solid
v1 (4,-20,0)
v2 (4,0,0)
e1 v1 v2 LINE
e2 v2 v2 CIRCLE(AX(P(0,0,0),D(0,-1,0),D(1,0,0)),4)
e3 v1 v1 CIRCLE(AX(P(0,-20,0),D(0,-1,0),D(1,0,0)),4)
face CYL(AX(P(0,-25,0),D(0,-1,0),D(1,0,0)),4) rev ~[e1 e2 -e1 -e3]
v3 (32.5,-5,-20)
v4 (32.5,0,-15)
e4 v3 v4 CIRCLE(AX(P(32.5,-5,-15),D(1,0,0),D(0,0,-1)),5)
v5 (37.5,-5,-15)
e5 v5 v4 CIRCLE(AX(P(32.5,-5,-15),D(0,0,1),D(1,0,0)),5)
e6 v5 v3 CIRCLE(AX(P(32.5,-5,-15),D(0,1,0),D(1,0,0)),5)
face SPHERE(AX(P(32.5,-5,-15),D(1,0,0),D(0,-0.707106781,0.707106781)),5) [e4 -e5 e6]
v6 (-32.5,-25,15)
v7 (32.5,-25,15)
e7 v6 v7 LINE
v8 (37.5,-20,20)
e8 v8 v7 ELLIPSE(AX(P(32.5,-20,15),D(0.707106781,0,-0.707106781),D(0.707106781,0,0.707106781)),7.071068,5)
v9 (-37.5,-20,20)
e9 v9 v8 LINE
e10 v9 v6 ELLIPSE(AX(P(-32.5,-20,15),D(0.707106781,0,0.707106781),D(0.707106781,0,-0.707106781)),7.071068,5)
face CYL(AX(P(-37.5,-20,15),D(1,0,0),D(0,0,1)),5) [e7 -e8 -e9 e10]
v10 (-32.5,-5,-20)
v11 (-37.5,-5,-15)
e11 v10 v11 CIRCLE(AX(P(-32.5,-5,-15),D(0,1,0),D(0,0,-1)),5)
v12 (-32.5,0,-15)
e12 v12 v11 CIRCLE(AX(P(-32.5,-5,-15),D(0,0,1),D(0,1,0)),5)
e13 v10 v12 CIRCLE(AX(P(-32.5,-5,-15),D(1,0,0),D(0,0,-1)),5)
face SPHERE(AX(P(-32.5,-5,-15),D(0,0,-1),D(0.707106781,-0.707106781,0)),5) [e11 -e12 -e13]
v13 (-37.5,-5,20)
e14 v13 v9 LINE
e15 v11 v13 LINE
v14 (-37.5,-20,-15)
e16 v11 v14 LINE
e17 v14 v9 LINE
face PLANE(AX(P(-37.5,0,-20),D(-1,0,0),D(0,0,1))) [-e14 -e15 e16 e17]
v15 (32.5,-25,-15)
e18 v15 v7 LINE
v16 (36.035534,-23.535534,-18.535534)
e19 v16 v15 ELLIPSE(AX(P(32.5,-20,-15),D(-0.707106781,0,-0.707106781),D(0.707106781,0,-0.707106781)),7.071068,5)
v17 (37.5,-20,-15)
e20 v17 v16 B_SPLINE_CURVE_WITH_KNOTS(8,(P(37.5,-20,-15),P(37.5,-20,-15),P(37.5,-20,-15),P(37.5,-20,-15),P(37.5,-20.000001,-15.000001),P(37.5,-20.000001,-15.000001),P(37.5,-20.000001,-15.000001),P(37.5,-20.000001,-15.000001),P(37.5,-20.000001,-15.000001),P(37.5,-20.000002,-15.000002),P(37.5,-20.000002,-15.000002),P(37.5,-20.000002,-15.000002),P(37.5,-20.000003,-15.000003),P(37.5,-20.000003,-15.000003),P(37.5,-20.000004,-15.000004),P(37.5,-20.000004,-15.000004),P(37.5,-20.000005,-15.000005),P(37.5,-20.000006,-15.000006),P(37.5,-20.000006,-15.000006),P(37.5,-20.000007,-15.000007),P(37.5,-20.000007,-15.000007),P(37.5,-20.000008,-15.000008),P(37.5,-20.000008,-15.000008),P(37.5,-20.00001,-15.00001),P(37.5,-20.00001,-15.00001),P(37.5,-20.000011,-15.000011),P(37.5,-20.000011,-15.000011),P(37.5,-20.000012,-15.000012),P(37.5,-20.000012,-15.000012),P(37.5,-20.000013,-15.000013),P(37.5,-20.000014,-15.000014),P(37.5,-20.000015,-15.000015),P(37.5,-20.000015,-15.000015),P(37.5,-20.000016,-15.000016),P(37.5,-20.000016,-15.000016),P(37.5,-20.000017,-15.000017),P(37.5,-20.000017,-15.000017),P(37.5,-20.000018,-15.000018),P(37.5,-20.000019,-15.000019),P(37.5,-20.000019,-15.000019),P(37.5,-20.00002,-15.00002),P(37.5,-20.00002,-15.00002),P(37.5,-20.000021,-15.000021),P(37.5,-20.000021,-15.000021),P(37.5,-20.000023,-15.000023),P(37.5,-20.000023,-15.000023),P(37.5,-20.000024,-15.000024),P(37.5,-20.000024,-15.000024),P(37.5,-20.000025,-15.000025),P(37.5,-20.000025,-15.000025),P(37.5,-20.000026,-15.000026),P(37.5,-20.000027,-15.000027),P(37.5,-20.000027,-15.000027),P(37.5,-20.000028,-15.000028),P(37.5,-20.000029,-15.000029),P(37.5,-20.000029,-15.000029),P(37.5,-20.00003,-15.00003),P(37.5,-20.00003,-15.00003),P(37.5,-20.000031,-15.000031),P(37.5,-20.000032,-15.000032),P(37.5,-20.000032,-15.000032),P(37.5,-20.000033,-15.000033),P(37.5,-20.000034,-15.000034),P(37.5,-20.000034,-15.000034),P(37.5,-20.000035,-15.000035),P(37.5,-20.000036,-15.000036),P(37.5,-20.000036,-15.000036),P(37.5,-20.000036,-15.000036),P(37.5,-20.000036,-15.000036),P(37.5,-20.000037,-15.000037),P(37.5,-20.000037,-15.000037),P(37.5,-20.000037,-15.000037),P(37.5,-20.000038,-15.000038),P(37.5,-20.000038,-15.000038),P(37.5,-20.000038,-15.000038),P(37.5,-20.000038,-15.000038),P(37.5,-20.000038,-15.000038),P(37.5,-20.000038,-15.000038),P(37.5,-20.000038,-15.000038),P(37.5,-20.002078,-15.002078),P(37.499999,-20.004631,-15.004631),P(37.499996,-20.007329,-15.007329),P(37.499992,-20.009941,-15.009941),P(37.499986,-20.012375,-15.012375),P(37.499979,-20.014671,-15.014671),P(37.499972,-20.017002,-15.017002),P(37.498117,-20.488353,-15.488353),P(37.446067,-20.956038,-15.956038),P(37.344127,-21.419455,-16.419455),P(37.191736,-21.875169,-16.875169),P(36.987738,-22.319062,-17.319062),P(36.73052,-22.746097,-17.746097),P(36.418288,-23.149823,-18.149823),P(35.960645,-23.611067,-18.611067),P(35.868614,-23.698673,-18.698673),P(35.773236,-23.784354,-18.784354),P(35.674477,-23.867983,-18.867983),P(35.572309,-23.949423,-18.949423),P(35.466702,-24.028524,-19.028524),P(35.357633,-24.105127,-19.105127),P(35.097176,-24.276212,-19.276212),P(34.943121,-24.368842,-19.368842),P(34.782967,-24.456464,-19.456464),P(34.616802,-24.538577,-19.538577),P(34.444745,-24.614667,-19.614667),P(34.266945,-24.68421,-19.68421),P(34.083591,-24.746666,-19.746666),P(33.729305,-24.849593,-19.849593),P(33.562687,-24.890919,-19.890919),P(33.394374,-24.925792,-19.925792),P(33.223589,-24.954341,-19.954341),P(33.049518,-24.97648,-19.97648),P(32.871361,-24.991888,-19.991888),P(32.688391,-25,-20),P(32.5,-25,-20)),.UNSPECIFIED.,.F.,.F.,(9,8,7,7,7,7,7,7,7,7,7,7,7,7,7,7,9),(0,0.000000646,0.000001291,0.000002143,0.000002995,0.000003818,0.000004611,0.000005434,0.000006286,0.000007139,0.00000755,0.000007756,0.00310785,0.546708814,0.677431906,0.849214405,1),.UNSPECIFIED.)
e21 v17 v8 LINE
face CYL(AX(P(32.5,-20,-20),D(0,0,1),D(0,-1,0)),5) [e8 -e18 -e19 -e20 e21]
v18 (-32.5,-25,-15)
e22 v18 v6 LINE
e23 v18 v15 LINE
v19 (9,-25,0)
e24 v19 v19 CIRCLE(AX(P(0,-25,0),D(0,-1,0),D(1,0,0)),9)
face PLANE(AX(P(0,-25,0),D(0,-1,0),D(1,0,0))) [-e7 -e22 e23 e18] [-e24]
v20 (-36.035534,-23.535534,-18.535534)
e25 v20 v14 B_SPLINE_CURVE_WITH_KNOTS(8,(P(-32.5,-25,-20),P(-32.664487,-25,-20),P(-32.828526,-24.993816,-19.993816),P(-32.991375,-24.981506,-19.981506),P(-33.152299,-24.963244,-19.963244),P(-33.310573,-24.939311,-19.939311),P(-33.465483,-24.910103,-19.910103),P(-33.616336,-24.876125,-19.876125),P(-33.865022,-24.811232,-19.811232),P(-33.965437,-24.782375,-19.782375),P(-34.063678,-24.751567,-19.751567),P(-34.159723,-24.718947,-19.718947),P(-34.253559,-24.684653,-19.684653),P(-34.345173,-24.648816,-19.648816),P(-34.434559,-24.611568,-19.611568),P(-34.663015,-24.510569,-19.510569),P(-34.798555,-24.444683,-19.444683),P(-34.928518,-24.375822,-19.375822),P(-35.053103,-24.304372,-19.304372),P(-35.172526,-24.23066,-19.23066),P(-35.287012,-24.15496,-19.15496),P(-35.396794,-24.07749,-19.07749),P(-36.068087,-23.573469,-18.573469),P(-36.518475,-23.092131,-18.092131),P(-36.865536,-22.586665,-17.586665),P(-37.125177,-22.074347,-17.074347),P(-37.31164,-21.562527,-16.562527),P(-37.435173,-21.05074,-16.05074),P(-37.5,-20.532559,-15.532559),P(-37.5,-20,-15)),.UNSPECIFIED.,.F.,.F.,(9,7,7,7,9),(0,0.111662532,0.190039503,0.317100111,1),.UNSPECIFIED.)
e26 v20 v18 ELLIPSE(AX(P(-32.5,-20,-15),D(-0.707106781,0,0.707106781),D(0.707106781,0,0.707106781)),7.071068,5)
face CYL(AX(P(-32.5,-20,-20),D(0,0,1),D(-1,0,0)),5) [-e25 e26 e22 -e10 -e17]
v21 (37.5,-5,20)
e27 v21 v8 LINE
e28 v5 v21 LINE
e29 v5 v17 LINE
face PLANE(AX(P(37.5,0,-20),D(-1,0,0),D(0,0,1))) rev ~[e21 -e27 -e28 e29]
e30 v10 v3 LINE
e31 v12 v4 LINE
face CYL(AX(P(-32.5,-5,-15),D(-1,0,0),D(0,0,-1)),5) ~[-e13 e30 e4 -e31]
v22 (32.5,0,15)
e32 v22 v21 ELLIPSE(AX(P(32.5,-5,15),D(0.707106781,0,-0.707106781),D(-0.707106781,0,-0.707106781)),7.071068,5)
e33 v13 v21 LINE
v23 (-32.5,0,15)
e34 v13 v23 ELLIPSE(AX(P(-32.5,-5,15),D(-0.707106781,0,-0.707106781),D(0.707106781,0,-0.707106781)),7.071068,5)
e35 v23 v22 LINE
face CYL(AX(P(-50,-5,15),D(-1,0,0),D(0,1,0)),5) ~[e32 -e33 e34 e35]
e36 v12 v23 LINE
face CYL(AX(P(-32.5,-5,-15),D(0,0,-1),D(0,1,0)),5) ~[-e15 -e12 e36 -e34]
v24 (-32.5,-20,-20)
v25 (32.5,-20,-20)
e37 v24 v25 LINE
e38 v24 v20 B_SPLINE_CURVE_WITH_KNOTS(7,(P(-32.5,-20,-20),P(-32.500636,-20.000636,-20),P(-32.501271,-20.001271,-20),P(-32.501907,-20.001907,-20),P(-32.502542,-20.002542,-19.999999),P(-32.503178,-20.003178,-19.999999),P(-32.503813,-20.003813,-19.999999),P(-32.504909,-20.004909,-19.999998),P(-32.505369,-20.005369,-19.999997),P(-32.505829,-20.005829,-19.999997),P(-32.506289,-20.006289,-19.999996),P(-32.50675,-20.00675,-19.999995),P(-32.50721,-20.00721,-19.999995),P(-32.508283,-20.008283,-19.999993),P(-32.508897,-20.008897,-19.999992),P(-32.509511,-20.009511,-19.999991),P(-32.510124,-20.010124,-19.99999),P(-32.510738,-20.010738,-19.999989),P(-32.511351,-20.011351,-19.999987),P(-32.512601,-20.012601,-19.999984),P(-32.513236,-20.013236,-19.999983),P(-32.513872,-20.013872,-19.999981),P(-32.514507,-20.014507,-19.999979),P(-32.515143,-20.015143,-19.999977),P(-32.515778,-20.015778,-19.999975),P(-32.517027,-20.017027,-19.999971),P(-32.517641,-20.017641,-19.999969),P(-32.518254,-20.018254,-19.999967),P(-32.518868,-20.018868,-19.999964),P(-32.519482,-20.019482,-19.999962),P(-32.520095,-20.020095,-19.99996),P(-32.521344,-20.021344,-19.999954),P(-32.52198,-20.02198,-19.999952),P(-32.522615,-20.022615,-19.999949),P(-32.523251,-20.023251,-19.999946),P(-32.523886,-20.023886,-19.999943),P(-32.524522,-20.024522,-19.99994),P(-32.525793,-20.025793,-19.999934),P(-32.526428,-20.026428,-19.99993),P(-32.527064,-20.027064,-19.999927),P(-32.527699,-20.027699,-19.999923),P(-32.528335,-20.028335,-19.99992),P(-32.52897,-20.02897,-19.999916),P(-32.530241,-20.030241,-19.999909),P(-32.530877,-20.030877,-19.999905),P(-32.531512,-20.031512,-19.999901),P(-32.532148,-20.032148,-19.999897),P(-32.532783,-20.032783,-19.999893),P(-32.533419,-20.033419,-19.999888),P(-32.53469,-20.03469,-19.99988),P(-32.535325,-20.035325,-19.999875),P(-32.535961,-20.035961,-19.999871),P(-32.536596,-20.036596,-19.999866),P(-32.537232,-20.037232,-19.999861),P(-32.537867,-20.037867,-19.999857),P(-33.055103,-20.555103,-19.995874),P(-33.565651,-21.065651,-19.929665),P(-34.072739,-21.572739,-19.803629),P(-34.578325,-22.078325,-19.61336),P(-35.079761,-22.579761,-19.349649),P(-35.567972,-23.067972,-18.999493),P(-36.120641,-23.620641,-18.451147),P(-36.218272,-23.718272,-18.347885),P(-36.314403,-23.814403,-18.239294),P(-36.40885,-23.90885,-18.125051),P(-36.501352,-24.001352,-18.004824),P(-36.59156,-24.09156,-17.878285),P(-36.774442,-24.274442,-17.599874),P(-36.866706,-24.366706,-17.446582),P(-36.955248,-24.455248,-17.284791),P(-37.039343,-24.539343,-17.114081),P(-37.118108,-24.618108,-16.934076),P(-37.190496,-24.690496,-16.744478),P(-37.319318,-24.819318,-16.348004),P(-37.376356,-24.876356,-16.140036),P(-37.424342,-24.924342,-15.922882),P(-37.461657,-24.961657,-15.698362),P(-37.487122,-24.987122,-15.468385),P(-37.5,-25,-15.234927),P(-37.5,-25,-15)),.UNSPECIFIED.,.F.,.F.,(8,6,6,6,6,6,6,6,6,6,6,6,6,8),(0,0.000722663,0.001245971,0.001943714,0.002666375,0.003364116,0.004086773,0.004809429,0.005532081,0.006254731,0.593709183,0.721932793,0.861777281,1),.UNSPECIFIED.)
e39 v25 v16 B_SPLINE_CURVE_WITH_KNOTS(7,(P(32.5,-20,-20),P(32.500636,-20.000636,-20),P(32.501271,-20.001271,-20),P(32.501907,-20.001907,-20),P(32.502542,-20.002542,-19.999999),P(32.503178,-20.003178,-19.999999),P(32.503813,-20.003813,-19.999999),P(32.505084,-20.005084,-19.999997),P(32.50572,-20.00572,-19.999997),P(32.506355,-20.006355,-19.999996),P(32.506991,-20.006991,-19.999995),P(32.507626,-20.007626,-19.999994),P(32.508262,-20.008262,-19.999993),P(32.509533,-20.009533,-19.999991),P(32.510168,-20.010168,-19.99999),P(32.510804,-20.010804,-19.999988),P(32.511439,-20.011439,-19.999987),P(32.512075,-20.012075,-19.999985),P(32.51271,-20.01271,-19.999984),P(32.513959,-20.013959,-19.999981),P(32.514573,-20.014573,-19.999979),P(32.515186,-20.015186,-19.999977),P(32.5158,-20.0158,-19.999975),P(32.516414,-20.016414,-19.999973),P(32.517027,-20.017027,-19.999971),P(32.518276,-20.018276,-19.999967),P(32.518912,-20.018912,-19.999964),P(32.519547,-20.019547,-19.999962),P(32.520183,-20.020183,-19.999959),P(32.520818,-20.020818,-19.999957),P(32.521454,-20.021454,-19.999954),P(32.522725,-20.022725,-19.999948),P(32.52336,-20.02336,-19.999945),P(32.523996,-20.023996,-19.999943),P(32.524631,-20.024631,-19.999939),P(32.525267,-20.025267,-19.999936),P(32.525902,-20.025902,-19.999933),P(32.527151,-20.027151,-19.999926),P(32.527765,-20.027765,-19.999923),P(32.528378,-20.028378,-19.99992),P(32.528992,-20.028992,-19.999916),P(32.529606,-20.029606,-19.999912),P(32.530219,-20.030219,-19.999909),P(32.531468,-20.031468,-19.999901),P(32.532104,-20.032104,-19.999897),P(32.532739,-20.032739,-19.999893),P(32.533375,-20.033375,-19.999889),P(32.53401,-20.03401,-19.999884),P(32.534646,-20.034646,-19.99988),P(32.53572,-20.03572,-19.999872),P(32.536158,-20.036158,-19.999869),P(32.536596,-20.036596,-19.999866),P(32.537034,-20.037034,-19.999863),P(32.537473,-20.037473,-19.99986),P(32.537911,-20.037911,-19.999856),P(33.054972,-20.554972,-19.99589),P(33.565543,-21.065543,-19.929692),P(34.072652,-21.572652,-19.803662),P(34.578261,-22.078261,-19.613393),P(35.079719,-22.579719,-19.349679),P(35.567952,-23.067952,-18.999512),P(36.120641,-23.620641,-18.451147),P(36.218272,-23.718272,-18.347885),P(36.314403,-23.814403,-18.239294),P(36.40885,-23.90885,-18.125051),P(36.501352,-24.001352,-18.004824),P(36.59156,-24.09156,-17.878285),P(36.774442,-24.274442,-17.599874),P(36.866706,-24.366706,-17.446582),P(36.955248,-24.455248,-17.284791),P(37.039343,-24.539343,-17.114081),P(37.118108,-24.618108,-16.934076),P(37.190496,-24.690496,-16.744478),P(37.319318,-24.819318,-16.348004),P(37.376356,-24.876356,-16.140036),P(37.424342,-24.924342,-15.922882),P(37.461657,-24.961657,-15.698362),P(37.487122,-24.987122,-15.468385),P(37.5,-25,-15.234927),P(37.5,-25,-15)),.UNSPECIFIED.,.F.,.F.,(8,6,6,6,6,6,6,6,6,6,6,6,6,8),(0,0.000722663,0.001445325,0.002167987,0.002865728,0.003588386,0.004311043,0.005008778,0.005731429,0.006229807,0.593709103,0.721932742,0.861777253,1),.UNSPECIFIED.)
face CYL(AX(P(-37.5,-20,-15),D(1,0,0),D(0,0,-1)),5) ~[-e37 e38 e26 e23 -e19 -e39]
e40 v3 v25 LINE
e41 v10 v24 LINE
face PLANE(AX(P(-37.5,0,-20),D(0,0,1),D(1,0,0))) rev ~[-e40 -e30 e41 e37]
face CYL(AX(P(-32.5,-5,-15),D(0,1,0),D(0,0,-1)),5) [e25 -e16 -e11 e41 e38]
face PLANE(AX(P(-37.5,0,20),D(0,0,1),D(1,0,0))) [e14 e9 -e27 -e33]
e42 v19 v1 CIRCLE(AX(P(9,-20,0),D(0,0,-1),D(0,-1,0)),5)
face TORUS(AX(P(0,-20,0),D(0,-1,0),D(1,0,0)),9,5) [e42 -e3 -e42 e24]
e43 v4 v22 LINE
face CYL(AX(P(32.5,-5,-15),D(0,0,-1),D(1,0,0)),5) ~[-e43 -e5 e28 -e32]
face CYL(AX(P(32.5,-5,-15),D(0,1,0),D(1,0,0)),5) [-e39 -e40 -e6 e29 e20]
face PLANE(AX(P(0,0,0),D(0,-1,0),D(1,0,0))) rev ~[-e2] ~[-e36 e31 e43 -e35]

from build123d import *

# Parameters (mm, degrees)
F0_W         = 75
F0_H         = 40
F1_DEPTH     = 25
F2_R         = 4
F3_DEPTH     = 25
F4_R         = 5
F5_T1_DEPTH  = 27.5
F5_T3_DEPTH  = 65
F5_T5_DEPTH  = 47.5
F5_T7_DEPTH  = 100
F5_S11_W     = 5.1
F5_S11_H     = 5.1
F5_T12_DEPTH = 5.1
F5_S17_W     = 5.1
F5_S17_H     = 5.1
F5_T18_DEPTH = 5.1


# Not quite as in the source:
# - a fillet or chamfer that OpenCascade refuses, or shapes differently, is made with other operations: its cross-section is extruded or revolved along the edge and cut away or added


with BuildPart() as f1:
    # F0 (on Front) → F1 (new body)
    with BuildSketch(Plane.XZ):
        Rectangle(F0_W, F0_H)
    extrude(amount=F1_DEPTH)

    # F2 (on face) → F3 (cut)
    with BuildSketch(Plane.XZ.offset(25)):
        Circle(F2_R)
    extrude(amount=-F3_DEPTH, mode=Mode.SUBTRACT)

    # F4
    f4_edges = [f1.edges().sort_by_distance(p)[0] for p in [
        (0, -25, 20),
        (-37.5, -25, 0),
        (0, -25, -20),
        (37.5, -25, 0),
    ]]
    fillet(f4_edges, radius=F4_R)

    # F5: fillet of radius 5 on 8 edges, made by hand

    # F5_s2 → F5_t1 (cut)
    with BuildSketch(Plane.XZ.offset(5)):
        with BuildLine():
            ThreePointArc((-32.5, -20), (-36.0355339059, -18.5355339059), (-37.5, -15))
            Line((-37.5, -15), (-37.5, -20))
            Line((-37.5, -20), (-32.5, -20))
        make_face()
        with BuildLine():
            ThreePointArc((37.5, -15), (36.0355339059, -18.5355339059), (32.5, -20))
            Line((32.5, -20), (37.5, -20))
            Line((37.5, -20), (37.5, -15))
        make_face()
    extrude(amount=F5_T1_DEPTH, mode=Mode.SUBTRACT)

    # F5_s4 → F5_t3 (cut)
    with BuildSketch(Plane.YZ.offset(-32.5)):
        with BuildLine():
            ThreePointArc((-5, -20), (-1.4644660941, -18.5355339059), (0, -15))
            Line((0, -15), (0, -20))
            Line((0, -20), (-5, -20))
        make_face()
    extrude(amount=F5_T3_DEPTH, mode=Mode.SUBTRACT)

    # F5_s6 → F5_t5 (cut)
    with BuildSketch(Plane.XY.offset(-15)):
        with BuildLine():
            ThreePointArc((37.5, -5), (36.0355339059, -1.4644660941), (32.5, 0))
            Line((32.5, 0), (37.5, 0))
            Line((37.5, 0), (37.5, -5))
        make_face()
        with BuildLine():
            ThreePointArc((-32.5, 0), (-36.0355339059, -1.4644660941), (-37.5, -5))
            Line((-37.5, -5), (-37.5, 0))
            Line((-37.5, 0), (-32.5, 0))
        make_face()
    extrude(amount=F5_T5_DEPTH, mode=Mode.SUBTRACT)

    # F5_s8 → F5_t7 (cut)
    with BuildSketch(Plane.YZ.offset(-50)):
        with BuildLine():
            ThreePointArc((0, 15), (-1.4644660941, 18.5355339059), (-5, 20))
            Line((-5, 20), (0, 20))
            Line((0, 20), (0, 15))
        make_face()
    extrude(amount=F5_T7_DEPTH, mode=Mode.SUBTRACT)


with BuildPart() as f5_tool10:
    # F5_s11 → F5_t12 (new body)
    with BuildSketch(Plane.XY.offset(-15)):
        with Locations((-35.05, -2.45)):
            Rectangle(F5_S11_W, F5_S11_H)
    extrude(amount=-F5_T12_DEPTH)

    # F5_s13 → F5_t14 (revolve, cut)
    with BuildSketch(Plane(origin=(-32.5, -5, -15), x_dir=(0.7071067812, -0.7071067812, 0), z_dir=(0.7071067812, 0.7071067812, 0))):
        with BuildLine():
            ThreePointArc((0, -5), (5, 0), (0, 5))
            Line((0, 5), (0, -5))
        make_face()
    revolve(axis=Axis((-32.5, -5, -15), (0, 0, -1)), mode=Mode.SUBTRACT)


with BuildPart() as f1_1:
    add(f1.part)

    # F5_t9: cut F5_tool10
    add(f5_tool10.part, mode=Mode.SUBTRACT)


with BuildPart() as f5_tool16:
    # F5_s17 → F5_t18 (new body)
    with BuildSketch(Plane.YZ.offset(32.5)):
        with Locations((-2.45, -17.55)):
            Rectangle(F5_S17_W, F5_S17_H)
    extrude(amount=F5_T18_DEPTH)

    # F5_s19 → F5_t20 (revolve, cut)
    with BuildSketch(Plane(origin=(32.5, -5, -15), x_dir=(0, -0.7071067812, 0.7071067812), z_dir=(0, 0.7071067812, 0.7071067812))):
        with BuildLine():
            ThreePointArc((0, -5), (5, 0), (0, 5))
            Line((0, 5), (0, -5))
        make_face()
    revolve(axis=Axis((32.5, -5, -15), (1, 0, 0)), mode=Mode.SUBTRACT)


with BuildPart() as f1_2:
    add(f1_1.part)

    # F5_t15: cut F5_tool16
    add(f5_tool16.part, mode=Mode.SUBTRACT)

    # F5_s21 → F5_t22 (revolve, cut)
    with BuildSketch(Plane.XY):
        with BuildLine():
            ThreePointArc((9, -25), (5.4644660941, -23.5355339059), (4, -20))
            Line((4, -20), (4, -25))
            Line((4, -25), (9, -25))
        make_face()
    revolve(axis=Axis((0, -25, 0), (0, -1, 0)), mode=Mode.SUBTRACT)


solid = f1_2.part
